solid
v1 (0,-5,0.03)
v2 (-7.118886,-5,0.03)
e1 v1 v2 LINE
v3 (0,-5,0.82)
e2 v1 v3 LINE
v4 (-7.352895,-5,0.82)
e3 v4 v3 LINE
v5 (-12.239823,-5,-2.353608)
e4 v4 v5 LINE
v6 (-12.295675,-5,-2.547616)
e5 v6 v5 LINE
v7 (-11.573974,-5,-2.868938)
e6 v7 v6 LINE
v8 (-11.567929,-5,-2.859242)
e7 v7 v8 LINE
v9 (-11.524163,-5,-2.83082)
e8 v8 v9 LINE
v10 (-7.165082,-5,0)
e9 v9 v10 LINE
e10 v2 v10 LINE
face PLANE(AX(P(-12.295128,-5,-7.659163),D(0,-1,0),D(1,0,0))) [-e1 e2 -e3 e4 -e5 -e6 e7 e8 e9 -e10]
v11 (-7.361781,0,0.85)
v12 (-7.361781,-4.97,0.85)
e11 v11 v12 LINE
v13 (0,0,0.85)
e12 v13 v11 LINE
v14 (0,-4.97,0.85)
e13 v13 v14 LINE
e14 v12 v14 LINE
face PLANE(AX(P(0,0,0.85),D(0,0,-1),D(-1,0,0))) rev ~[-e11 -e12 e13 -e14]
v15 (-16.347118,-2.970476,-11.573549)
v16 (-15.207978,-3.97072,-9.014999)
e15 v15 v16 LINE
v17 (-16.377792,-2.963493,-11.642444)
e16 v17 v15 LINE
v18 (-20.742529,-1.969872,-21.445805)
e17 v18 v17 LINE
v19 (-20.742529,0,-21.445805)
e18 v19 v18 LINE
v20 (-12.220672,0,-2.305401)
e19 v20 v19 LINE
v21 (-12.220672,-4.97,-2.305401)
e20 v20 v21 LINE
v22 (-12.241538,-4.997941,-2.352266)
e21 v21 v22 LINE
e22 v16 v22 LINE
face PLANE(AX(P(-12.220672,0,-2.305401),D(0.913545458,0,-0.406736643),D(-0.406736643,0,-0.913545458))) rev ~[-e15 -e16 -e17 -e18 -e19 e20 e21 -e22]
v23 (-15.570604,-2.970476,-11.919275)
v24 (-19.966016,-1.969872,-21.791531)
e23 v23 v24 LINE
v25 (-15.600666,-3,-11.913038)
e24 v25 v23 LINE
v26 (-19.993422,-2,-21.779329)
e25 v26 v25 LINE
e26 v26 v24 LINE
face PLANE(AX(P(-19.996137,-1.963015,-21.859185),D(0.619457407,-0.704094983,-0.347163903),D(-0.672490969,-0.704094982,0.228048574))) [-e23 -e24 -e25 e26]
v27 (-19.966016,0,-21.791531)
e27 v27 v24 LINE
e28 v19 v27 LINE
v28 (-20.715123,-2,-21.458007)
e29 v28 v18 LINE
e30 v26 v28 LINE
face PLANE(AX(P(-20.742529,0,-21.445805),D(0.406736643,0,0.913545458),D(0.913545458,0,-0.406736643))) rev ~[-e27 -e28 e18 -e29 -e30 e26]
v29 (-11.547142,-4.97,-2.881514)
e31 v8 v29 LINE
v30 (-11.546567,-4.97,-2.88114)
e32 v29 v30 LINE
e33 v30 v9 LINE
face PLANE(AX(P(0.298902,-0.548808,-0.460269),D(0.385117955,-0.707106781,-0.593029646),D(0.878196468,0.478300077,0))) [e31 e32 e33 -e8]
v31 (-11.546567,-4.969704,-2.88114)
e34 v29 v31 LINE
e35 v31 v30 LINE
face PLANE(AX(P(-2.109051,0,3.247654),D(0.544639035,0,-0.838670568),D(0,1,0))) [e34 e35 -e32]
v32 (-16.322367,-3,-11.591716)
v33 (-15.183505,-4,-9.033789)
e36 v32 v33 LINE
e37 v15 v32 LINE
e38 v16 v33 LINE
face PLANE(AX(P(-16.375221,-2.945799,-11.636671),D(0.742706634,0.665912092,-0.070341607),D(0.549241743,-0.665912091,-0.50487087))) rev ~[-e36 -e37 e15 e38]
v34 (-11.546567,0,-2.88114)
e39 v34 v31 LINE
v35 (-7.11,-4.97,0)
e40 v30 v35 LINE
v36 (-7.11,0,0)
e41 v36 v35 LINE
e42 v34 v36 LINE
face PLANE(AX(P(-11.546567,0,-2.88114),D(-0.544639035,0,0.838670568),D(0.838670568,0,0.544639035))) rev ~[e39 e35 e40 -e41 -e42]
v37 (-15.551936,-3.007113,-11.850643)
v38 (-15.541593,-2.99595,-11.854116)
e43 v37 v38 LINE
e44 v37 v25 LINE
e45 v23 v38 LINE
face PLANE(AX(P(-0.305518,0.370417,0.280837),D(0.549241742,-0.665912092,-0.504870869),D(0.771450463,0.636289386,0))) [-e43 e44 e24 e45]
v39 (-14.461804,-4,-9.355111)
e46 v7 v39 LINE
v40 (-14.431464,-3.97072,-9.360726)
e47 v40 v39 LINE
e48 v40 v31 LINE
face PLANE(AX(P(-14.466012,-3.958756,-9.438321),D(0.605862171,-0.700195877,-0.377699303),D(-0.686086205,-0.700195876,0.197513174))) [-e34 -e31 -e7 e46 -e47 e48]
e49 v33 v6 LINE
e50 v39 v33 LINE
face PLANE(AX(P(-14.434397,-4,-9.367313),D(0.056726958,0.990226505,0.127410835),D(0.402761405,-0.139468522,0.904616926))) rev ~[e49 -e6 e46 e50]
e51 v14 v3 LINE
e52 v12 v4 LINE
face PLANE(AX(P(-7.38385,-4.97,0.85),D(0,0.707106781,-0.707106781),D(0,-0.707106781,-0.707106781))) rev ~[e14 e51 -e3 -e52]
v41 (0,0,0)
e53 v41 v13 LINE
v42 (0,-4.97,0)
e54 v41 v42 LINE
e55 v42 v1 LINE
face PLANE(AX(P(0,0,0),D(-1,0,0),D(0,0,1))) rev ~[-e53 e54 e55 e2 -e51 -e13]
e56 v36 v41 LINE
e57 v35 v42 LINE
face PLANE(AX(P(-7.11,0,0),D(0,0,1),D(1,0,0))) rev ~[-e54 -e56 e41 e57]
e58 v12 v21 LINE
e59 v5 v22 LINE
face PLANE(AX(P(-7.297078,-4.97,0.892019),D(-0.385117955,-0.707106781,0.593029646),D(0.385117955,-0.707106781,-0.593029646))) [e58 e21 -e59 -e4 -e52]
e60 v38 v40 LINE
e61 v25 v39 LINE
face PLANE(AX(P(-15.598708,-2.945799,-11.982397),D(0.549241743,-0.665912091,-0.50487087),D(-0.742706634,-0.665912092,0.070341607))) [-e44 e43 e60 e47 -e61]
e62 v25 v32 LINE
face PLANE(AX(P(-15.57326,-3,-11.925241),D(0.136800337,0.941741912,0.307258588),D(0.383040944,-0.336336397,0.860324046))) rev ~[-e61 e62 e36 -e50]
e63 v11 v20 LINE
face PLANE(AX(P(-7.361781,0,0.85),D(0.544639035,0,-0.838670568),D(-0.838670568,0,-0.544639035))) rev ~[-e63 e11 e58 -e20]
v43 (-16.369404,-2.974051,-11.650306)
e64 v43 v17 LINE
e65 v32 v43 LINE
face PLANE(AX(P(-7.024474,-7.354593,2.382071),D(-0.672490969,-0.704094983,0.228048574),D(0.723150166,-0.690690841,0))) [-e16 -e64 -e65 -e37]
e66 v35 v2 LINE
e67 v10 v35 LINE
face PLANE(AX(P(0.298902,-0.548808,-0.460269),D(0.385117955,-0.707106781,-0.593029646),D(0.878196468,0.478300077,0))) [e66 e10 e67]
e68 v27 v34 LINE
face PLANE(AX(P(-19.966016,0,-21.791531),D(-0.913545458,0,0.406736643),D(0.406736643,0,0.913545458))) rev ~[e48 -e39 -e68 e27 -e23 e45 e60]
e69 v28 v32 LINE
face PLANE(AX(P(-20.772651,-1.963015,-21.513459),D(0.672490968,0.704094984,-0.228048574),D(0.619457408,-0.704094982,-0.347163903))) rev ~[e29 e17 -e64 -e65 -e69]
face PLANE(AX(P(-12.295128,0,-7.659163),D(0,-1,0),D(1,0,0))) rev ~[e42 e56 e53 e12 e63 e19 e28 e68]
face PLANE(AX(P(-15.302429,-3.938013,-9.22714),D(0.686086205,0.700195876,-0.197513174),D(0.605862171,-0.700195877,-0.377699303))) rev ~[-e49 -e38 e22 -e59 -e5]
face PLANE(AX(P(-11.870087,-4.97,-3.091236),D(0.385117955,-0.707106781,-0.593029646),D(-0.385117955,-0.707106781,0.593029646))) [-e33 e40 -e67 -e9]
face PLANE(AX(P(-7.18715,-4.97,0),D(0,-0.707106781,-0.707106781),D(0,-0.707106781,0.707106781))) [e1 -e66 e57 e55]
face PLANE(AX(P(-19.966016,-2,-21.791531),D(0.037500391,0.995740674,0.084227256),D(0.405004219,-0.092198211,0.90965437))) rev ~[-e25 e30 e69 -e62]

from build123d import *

# Parameters (mm, degrees)
F1_DEPTH     = 5
F3_DEPTH     = 25
F4_T1_DEPTH  = 5.9478639207
F4_T6_DEPTH  = 11.0004984696
F4_T11_DEPTH = 3.281815708
F4_T16_DEPTH = 7.2643009793
F4_T21_DEPTH = 5.7529029378
F5_T1_DEPTH  = 7.6329796459
F5_T3_DEPTH  = 7.4610000963
F5_T8_DEPTH  = 7.4842482227
F5_T13_DEPTH = 7.4842482227
F5_T18_DEPTH = 3.281815708
F5_T23_DEPTH = 11.0004984696


# Not quite as in the source:
# - a fillet or chamfer that OpenCascade refuses, or shapes differently, is made with other operations: its cross-section is extruded or revolved along the edge and cut away or added


with BuildPart() as f1:
    # F0 (on Front) → F1 (new body)
    with BuildSketch(Plane.XZ):
        Polygon((-7.11, 0), (0, 0), (0, 0.85), (-7.3617814707, 0.85), (-12.2206721932, -2.3054005297), (-20.7425294551, -21.4458053218), (-19.9660158161, -21.7915314684), (-11.5465673044, -2.8811404952), align=None)
    extrude(amount=F1_DEPTH)

    # F2 (on face) → F3 (cut)
    with BuildSketch(Plane(origin=(-8.5658121179, 0, 3.8137452678), x_dir=(0, 1, 0), z_dir=(0.9135454576, 0, -0.4067366431))):
        Polygon((-4, -14.4284648367), (-5, -7.3284648367), (-5, -28.0284648367), (-2, -28.0284648367), (-3, -17.2284648367), align=None)
    extrude(amount=-F3_DEPTH, mode=Mode.SUBTRACT)

    # F4: chamfer of 0.03 on 5 edges, made by hand

    # F4_s2 → F4_t1 (cut)
    with BuildSketch(Plane(origin=(-4.7250832121, 0, -3.0685049164), x_dir=(0, 1, 0), z_dir=(-0.8386705679, 0, -0.544639035))):
        Polygon((-4.97, -4.722383539), (-5, -4.692383539), (-5, -4.722383539), align=None)
    extrude(amount=F4_T1_DEPTH, mode=Mode.SUBTRACT)


with BuildPart() as f4_tool4:
    # F4_s5 → F4_t6 (new body)
    with BuildSketch(Plane(origin=(-11.2598610976, 2.5632795791, -25.2900620943), x_dir=(0.2219685938, 0.9750538156, 0), z_dir=(0.4050042191, -0.0921982106, 0.9096543698))):
        Polygon((-6.352559346, 8.2598889374), (-6.3880194376, 8.283182325), (-6.3819360855, 8.2538055854), align=None)
    extrude(amount=F4_T6_DEPTH)

    split(bisect_by=Plane(origin=(-0.3055183915, 0.3704168412, 0.2808368777), x_dir=(0.771450463, 0.6362893863, 0), z_dir=(0.549241742, -0.6659120918, -0.5048708694)), keep=Keep.TOP)


with BuildPart() as f1_1:
    add(f1.part)

    # F4_t3: cut F4_tool4
    add(f4_tool4.part, mode=Mode.SUBTRACT)


with BuildPart() as f4_tool9:
    # F4_s10 → F4_t11 (new body)
    with BuildSketch(Plane(origin=(-5.8578101844, 5.1435618144, -13.1568570886), x_dir=(0.659809773, 0.751432674, 0), z_dir=(0.3830409438, -0.336336397, 0.8603240456))):
        Polygon((-12.5057496784, 2.3040031535), (-12.5477702003, 2.3098577021), (-12.5296872137, 2.2859201669), align=None)
    extrude(amount=F4_T11_DEPTH)

    split(bisect_by=Plane(origin=(-2.1159962098, 2.405108563, 1.1858724964), x_dir=(0.7507908153, 0.6605400454, 0), z_dir=(0.6194574075, -0.7040949829, -0.3471639027)), keep=Keep.TOP)


with BuildPart() as f1_2:
    add(f1_1.part)

    # F4_t8: cut F4_tool9
    add(f4_tool9.part, mode=Mode.SUBTRACT)


with BuildPart() as f4_tool14:
    # F4_s15 → F4_t16 (new body)
    with BuildSketch(Plane.YZ.offset(-7.1871504896)):
        Polygon((-4.97, 0), (-5, 0.03), (-5, 0), align=None)
    extrude(amount=F4_T16_DEPTH)

    split(bisect_by=Plane(origin=(0.2989023851, -0.5488082305, -0.4602693104), x_dir=(0.878196468, 0.4783000769, 0), z_dir=(0.385117955, -0.7071067812, -0.5930296458)), keep=Keep.TOP)


with BuildPart() as f1_3:
    add(f1_2.part)

    # F4_t13: cut F4_tool14
    add(f4_tool14.part, mode=Mode.SUBTRACT)


with BuildPart() as f4_tool19:
    # F4_s20 → F4_t21 (new body)
    with BuildSketch(Plane(origin=(-9.7610352954, 0, -6.3388904383), x_dir=(0, 1, 0), z_dir=(0.8386705679, 0, 0.544639035))):
        Polygon((-4.97, 3.872383539), (-5, 3.902383539), (-5, 3.872383539), align=None)
    extrude(amount=F4_T21_DEPTH)

    split(bisect_by=Plane(origin=(-8.5658121179, 0, 3.8137452678), x_dir=(0, 1, 0), z_dir=(0.9135454576, 0, -0.4067366431)), keep=Keep.TOP)

    split(bisect_by=Plane(origin=(0, -2.485, -2.485), x_dir=(1, 0, 0), z_dir=(0, -0.7071067812, -0.7071067812)), keep=Keep.TOP)


with BuildPart() as f1_4:
    add(f1_3.part)

    # F4_t18: cut F4_tool19
    add(f4_tool19.part, mode=Mode.SUBTRACT)

    # F5: chamfer of 0.03 on 5 edges, made by hand

    # F5_s2 → F5_t1 (cut)
    with BuildSketch(Plane(origin=(-5.6229623165, 1.9471236166, -12.6293801411), x_dir=(0.3272176494, 0.9449489986, 0), z_dir=(0.4027614046, -0.1394685218, 0.9046169258))):
        Polygon((-8.7284463039, 7.9822536907), (-8.7481067262, 7.9446575766), (-8.7570745721, 7.9732858448), align=None)
    extrude(amount=F5_T1_DEPTH, mode=Mode.SUBTRACT)

    # F5_s4 → F5_t3 (cut)
    with BuildSketch(Plane.YZ.offset(-7.3838496067)):
        Polygon((-4.97, 0.85), (-5, 0.82), (-5, 0.85), align=None)
    extrude(amount=F5_T3_DEPTH, mode=Mode.SUBTRACT)


with BuildPart() as f5_tool6:
    # F5_s7 → F5_t8 (new body)
    with BuildSketch(Plane(origin=(-5.5630590396, 1.9263802648, -12.4948351783), x_dir=(0.3272176494, 0.9449489986, 0), z_dir=(0.4027614046, -0.1394685218, 0.9046169258))):
        Polygon((-8.4743573363, 7.1711194253), (-8.5119534504, 7.1907798476), (-8.5029856044, 7.1621515794), align=None)
    extrude(amount=F5_T8_DEPTH)

    split(bisect_by=Plane(origin=(0.2989023851, -0.5488082305, -0.4602693104), x_dir=(0.878196468, 0.4783000769, 0), z_dir=(0.385117955, -0.7071067812, -0.5930296458)), keep=Keep.TOP)


with BuildPart() as f1_5:
    add(f1_4.part)

    # F5_t5: cut F5_tool6
    add(f5_tool6.part, mode=Mode.SUBTRACT)


with BuildPart() as f5_tool11:
    # F5_s12 → F5_t13 (new body)
    with BuildSketch(Plane(origin=(-5.5630590396, 1.9263802648, -12.4948351783), x_dir=(0.3272176494, 0.9449489986, 0), z_dir=(0.4027614046, -0.1394685218, 0.9046169258))):
        Polygon((-8.4743573363, 7.1711194253), (-8.5119534504, 7.1907798476), (-8.5029856044, 7.1621515794), align=None)
    extrude(amount=F5_T13_DEPTH)

    split(bisect_by=Plane(origin=(-2.1090512339, 0, 3.2476541019), x_dir=(0, 1, 0), z_dir=(0.544639035, 0, -0.8386705679)), keep=Keep.TOP)


with BuildPart() as f1_6:
    add(f1_5.part)

    # F5_t10: cut F5_tool11
    add(f5_tool11.part, mode=Mode.SUBTRACT)


with BuildPart() as f5_tool16:
    # F5_s17 → F5_t18 (new body)
    with BuildSketch(Plane(origin=(-5.8578101844, 5.1435618144, -13.1568570886), x_dir=(0.659809773, 0.751432674, 0), z_dir=(0.3830409438, -0.336336397, 0.8603240456))):
        Polygon((-13.0181009663, 2.9822333193), (-13.0239555149, 2.9402127974), (-13.0420385015, 2.9641503327), align=None)
    extrude(amount=F5_T18_DEPTH)

    split(bisect_by=Plane(origin=(-7.0244742563, -7.3545925713, 2.3820711564), x_dir=(0.7231501661, -0.6906908406, 0), z_dir=(-0.6724909686, -0.7040949829, 0.2280485743)), keep=Keep.TOP)


with BuildPart() as f1_7:
    add(f1_6.part)

    # F5_t15: cut F5_tool16
    add(f5_tool16.part, mode=Mode.SUBTRACT)


with BuildPart() as f5_tool21:
    # F5_s22 → F5_t23 (new body)
    with BuildSketch(Plane(origin=(-11.2598610976, 2.5632795791, -25.2900620943), x_dir=(0.2219685938, 0.9750538156, 0), z_dir=(0.4050042191, -0.0921982106, 0.9096543698))):
        Polygon((-6.5249209865, 9.0922298921), (-6.548214374, 9.0567698005), (-6.554297726, 9.0861465401), align=None)
    extrude(amount=F5_T23_DEPTH)

    split(bisect_by=Plane(origin=(-9.881776244, -8.860018193, 0.9359011948), x_dir=(0.6675656779, -0.7445509155, 0), z_dir=(-0.742706634, -0.6659120918, 0.0703416075)), keep=Keep.TOP)


with BuildPart() as f1_8:
    add(f1_7.part)

    # F5_t20: cut F5_tool21
    add(f5_tool21.part, mode=Mode.SUBTRACT)


solid = f1_8.part
